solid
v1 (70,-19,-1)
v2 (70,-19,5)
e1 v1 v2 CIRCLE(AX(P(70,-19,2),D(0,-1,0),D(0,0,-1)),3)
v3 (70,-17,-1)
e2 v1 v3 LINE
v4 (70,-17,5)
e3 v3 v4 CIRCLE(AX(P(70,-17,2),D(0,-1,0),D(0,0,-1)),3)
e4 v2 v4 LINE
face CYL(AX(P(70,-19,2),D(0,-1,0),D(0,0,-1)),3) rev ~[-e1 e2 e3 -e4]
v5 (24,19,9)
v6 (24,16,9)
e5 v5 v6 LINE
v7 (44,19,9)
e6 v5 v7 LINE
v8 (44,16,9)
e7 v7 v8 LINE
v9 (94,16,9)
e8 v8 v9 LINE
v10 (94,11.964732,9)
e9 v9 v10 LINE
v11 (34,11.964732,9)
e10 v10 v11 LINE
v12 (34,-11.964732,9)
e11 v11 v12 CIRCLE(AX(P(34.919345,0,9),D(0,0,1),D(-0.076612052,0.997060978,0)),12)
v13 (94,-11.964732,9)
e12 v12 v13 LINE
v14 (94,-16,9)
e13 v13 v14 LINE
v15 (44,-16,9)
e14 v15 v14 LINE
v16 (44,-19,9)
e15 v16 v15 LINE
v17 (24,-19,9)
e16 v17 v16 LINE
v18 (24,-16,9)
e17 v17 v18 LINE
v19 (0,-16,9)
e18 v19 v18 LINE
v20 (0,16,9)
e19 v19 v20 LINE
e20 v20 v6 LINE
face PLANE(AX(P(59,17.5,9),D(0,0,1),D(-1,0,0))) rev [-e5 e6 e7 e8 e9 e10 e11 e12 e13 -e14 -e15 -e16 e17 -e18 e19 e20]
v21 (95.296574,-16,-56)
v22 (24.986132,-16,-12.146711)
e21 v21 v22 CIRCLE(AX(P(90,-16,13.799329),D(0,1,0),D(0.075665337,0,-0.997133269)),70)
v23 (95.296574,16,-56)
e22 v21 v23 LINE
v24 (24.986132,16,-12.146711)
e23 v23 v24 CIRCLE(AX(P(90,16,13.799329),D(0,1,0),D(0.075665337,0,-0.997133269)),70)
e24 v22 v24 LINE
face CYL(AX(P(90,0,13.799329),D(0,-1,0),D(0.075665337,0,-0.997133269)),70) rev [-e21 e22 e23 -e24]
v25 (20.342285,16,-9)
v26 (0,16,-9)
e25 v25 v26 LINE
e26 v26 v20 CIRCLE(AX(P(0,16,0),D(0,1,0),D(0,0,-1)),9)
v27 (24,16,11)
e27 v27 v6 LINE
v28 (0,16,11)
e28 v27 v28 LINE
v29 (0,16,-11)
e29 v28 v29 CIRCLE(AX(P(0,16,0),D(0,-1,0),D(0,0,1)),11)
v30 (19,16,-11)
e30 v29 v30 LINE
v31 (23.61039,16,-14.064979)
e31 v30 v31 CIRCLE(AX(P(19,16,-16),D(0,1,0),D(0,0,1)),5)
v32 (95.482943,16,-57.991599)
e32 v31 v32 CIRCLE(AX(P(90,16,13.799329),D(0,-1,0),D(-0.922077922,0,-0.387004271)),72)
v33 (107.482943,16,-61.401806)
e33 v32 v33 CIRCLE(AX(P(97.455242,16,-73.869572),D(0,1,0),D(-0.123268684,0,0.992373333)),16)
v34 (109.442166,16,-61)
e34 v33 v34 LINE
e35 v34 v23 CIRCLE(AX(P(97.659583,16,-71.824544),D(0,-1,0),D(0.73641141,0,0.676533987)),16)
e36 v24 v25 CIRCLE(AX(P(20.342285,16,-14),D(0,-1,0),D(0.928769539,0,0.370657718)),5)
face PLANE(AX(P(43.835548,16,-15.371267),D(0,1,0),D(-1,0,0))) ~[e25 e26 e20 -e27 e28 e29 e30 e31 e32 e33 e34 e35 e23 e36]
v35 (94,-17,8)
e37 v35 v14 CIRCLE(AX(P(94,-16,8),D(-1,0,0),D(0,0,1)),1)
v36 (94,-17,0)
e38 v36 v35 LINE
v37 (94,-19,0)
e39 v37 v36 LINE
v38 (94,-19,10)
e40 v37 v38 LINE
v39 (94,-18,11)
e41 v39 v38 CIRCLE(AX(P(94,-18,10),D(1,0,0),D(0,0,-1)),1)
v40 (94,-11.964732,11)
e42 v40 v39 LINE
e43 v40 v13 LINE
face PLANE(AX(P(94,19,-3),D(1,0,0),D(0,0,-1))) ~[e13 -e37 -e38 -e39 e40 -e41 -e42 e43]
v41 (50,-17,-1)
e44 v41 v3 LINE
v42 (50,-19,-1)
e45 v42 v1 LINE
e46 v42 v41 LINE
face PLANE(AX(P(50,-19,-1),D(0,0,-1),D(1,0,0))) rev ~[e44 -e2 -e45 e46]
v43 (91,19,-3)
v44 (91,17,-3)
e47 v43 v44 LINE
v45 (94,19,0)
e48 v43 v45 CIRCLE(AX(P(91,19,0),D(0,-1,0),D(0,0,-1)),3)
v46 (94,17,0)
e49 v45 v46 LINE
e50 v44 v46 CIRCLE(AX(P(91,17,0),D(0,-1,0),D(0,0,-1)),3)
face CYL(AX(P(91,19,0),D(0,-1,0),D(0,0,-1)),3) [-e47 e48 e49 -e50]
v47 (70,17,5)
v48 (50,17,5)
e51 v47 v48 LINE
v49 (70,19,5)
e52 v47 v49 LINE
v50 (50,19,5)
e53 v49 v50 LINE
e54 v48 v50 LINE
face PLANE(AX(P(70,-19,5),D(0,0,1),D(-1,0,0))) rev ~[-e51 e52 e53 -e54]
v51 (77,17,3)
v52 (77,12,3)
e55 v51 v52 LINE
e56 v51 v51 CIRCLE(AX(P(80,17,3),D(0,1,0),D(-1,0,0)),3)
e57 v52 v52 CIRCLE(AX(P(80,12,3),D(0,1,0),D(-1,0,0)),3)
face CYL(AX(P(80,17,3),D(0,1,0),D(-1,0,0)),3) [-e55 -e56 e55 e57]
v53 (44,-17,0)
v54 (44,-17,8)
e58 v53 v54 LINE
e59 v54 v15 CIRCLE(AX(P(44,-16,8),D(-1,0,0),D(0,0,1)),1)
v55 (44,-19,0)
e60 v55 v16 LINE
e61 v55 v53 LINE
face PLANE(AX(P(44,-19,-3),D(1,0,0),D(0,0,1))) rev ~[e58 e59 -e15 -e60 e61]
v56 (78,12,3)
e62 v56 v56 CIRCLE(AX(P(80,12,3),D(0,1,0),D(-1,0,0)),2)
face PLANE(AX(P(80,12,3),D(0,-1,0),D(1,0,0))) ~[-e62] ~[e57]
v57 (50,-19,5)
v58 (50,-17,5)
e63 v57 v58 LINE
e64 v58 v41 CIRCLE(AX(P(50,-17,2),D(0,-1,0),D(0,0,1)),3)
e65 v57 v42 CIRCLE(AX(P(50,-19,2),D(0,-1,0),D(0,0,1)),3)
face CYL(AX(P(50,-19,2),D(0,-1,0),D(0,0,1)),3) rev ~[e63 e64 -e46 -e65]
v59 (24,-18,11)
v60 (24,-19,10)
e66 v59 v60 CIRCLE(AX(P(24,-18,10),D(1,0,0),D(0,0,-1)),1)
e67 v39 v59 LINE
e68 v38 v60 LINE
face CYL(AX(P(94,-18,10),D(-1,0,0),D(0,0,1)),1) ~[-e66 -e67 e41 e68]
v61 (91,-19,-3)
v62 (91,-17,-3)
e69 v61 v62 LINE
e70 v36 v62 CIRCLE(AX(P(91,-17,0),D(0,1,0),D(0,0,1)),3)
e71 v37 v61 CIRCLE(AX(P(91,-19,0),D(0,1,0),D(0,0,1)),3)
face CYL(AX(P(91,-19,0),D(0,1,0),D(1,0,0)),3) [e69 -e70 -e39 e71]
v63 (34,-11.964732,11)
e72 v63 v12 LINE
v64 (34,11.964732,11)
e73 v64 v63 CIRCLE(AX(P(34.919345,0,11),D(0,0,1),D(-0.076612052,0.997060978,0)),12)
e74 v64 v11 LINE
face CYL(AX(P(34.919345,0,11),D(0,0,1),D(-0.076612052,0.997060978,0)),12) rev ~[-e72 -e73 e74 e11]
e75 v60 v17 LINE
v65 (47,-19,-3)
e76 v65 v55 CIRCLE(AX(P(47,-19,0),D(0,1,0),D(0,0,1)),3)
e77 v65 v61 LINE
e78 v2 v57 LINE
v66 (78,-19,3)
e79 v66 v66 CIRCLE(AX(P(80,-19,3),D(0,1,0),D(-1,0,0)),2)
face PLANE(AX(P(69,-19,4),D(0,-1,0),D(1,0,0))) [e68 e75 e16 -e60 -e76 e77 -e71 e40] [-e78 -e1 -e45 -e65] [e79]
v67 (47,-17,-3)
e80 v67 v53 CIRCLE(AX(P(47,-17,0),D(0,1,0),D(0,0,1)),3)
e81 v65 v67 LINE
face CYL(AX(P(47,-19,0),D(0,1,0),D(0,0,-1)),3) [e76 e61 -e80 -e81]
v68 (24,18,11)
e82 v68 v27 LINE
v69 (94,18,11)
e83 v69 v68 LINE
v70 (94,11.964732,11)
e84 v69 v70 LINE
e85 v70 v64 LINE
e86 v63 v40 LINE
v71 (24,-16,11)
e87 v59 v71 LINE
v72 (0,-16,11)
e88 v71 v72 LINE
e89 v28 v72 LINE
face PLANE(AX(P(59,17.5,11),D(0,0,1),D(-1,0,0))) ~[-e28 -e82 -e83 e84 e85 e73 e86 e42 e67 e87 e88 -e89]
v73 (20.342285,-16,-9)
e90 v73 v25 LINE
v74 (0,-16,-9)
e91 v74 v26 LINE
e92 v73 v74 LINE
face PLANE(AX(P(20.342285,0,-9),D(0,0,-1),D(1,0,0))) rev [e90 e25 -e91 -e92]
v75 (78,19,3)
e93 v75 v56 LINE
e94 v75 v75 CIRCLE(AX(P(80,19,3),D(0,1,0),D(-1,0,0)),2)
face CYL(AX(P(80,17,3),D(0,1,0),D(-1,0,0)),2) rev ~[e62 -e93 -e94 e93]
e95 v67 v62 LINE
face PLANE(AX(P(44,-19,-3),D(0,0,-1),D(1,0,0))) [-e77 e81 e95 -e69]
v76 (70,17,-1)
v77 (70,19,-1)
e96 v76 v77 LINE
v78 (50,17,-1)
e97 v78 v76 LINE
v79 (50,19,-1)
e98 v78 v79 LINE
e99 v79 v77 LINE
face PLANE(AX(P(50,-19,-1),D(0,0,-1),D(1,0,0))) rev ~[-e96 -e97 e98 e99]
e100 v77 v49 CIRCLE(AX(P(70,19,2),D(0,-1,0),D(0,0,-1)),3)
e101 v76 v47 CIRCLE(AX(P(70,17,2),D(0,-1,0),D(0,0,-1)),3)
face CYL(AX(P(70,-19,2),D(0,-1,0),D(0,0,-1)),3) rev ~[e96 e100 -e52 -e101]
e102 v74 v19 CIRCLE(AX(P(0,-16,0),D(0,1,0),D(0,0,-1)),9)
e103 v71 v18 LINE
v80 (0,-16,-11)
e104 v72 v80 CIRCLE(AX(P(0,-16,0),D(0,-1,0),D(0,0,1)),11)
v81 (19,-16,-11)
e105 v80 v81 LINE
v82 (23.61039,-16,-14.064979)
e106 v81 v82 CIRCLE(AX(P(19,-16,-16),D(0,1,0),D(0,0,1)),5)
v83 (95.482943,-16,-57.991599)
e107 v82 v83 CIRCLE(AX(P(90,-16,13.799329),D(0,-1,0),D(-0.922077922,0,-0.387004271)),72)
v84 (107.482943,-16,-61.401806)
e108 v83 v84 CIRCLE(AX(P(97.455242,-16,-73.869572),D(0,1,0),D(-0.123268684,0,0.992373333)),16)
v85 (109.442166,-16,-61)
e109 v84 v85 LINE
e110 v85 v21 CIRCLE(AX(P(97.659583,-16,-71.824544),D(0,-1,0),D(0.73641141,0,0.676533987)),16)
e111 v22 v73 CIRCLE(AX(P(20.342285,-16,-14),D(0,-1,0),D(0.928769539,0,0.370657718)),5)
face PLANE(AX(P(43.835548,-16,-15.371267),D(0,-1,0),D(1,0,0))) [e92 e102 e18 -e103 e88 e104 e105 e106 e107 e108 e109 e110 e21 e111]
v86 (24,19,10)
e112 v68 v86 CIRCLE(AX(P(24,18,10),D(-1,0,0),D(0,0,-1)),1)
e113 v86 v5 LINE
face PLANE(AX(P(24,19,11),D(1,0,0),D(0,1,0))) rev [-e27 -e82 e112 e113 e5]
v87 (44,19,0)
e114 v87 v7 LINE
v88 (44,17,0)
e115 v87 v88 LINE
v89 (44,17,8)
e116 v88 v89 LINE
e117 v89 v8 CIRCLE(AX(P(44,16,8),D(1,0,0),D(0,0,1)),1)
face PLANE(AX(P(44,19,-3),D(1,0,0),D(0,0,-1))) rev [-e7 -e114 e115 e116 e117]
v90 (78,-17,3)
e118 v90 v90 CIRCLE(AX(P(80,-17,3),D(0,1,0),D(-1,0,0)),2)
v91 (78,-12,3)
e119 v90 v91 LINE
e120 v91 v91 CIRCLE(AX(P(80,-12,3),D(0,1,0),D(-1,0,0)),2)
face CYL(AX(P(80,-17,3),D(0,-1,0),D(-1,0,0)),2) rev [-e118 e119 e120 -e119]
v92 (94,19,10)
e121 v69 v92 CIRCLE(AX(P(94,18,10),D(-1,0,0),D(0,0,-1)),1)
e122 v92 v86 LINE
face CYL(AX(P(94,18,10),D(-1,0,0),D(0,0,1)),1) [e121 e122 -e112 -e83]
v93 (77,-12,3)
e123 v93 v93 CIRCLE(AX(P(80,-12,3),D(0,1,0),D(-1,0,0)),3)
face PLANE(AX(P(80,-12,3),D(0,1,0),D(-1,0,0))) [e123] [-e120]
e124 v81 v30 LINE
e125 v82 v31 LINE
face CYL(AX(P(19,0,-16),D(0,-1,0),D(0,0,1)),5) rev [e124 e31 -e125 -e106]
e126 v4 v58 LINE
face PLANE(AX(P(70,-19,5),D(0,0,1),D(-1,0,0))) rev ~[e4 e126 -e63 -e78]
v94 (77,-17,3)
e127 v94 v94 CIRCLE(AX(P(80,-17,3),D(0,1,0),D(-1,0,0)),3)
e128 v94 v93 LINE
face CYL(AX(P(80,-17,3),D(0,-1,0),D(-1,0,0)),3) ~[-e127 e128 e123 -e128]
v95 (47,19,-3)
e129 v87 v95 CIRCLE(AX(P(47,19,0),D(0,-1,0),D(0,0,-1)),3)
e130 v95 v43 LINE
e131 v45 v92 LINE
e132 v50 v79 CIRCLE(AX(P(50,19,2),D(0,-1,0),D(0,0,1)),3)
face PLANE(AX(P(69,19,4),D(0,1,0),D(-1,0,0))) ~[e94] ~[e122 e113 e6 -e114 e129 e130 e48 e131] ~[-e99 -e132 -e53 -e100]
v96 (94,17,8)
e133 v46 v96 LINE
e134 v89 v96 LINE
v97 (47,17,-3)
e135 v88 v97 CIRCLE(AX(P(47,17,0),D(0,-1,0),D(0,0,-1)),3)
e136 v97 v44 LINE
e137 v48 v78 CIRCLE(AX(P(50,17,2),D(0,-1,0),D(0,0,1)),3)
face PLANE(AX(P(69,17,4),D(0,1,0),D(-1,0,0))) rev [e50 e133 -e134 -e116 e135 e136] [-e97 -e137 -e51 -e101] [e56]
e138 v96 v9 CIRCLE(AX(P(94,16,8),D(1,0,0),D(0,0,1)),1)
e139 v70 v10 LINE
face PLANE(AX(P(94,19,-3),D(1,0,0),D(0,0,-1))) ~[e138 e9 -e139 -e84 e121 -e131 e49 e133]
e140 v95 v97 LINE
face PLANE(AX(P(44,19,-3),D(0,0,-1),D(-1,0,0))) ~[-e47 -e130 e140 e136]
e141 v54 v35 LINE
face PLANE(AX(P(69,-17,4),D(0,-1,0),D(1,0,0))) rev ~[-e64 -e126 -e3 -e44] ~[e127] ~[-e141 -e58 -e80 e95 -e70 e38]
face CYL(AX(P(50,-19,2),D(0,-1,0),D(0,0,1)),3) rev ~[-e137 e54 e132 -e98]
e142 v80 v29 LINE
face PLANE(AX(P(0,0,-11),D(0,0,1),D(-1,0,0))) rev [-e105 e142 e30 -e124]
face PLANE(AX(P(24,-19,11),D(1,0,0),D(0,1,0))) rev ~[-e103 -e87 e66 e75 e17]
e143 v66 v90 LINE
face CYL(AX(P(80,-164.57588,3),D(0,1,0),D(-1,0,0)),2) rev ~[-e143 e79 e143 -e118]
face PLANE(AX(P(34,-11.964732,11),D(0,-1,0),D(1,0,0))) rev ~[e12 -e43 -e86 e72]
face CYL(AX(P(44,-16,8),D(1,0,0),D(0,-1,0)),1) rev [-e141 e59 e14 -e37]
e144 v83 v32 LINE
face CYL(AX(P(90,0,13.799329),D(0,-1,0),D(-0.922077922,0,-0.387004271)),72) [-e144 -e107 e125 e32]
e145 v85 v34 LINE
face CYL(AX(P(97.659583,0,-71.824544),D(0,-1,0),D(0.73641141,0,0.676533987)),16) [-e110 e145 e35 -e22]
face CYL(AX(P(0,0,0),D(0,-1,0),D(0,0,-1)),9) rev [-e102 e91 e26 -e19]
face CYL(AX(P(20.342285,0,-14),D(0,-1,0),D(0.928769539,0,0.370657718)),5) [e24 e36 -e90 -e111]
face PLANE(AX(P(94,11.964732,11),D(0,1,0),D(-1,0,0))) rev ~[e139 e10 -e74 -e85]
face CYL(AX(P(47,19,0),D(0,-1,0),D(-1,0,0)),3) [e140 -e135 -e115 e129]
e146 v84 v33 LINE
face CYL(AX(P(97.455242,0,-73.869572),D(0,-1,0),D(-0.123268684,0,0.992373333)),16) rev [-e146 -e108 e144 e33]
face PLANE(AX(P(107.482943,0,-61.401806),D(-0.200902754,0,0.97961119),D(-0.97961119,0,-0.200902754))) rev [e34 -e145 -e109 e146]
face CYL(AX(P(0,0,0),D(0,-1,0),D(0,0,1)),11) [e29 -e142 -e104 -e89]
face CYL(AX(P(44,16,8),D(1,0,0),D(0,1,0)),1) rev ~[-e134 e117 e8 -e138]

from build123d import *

# Parameters (mm, degrees)
F1_DEPTH  = 16
F3_W      = 70
F3_H      = 3
F4_DEPTH  = 2
F5_W      = 50
F5_H      = 14
F6_DEPTH  = 2
F7_R      = 1
F10_DEPTH = 2
F12_DEPTH = 38.001
F14_D     = 4
F15_R     = 3
F15_R_2   = 2
F16_DEPTH = 5
F17_R     = 3


# Not quite as in the source:
# - a pattern or mirror of a feature is missing from the dataset's text; its kind, count and spacing are read off the source's solid


with BuildPart() as f1:
    # F0 (on Front) → F1 (new body)
    with BuildSketch(Plane.XZ):
        with BuildLine():
            ThreePointArc((0, -9), (-9, 0), (0, 9))
            Line((0, 9), (94, 9))
            Line((94, 9), (94, 11))
            Line((94, 11), (0, 11))
            ThreePointArc((0, 11), (-11, 0), (0, -11))
            Line((0, -11), (19, -11))
            ThreePointArc((19, -11), (21.7681124643, -11.8361612201), (23.6103896104, -14.064978646))
            ThreePointArc((23.6103896104, -14.064978646), (52.4527960943, -47.6352500016), (95.4829432523, -57.9915990802))
            ThreePointArc((95.4829432523, -57.9915990802), (101.8289994783, -58.4789828394), (107.4829432523, -61.4018055084))
            Line((107.4829432523, -61.4018055084), (109.4421656321, -61))
            ThreePointArc((109.4421656321, -61), (102.9917579834, -56.7391896111), (95.2965735981, -56))
            ThreePointArc((95.2965735981, -56), (52.955209083, -45.5949761441), (24.9861322889, -12.1467114099))
            ThreePointArc((24.9861322889, -12.1467114099), (23.1470623984, -9.8607704249), (20.3422845953, -9))
            Line((20.3422845953, -9), (0, -9))
        make_face()
    extrude(amount=F1_DEPTH)

    # F3 (on face) → F4 (join)
    with BuildSketch(Plane.XY.offset(11)):
        with Locations((59, -17.5)):
            Rectangle(F3_W, F3_H)
    extrude(amount=-F4_DEPTH)

    # F5 (on face) → F6 (join)
    with BuildSketch(Plane.XZ.offset(19)):
        with Locations((69, 4)):
            Rectangle(F5_W, F5_H)
    extrude(amount=-F6_DEPTH)

    # F7
    f7_edges = [f1.edges().sort_by_distance(p)[0] for p in [
        (59, -19, 11),
        (69, -17, 9),
    ]]
    fillet(f7_edges, radius=F7_R)

    # F8: F1 across plane


with BuildPart() as f1_1:
    add(f1.part)
    add(f1.part.mirror(Plane.XZ))

    # F9 (on face) → F10 (cut)
    with BuildSketch(Plane.XY.offset(11)):
        with BuildLine():
            Line((94, 11.964731734), (34, 11.964731734))
            ThreePointArc((34, 11.964731734), (22.9193446211, 0), (34, -11.964731734))
            Line((34, -11.964731734), (94, -11.964731734))
            Line((94, -11.964731734), (94, 11.964731734))
        make_face()
    extrude(amount=-F10_DEPTH, mode=Mode.SUBTRACT)

    # F11 (on face) → F12 (cut, through all)
    with BuildSketch(Plane.XZ.offset(19)):
        with BuildLine():
            ThreePointArc((50, 5), (47, 2), (50, -1))
            Line((50, -1), (70, -1))
            ThreePointArc((70, -1), (73, 2), (70, 5))
            Line((70, 5), (50, 5))
        make_face()
    extrude(amount=-F12_DEPTH, mode=Mode.SUBTRACT)

    # F14 (through all)
    with Locations(Plane.XZ.offset(19)):
        with Locations((80, 3)):
            Hole(F14_D / 2)

    # F15 (on face) → F16 (join)
    with BuildSketch(Plane(origin=(0, -17, 0), x_dir=(-1, 0, 0), z_dir=(0, 1, 0))):
        with Locations((-80, 3)):
            Circle(F15_R)
        with Locations((-80, 3)):
            Circle(F15_R_2, mode=Mode.SUBTRACT)
    f16 = extrude(amount=F16_DEPTH)

    # F16_copies: F16 across plane
    add(f16.mirror(Plane.ZX))

    # F17
    f17_edges = [f1_1.edges().sort_by_distance(p)[0] for p in [
        (44, -18, -3),
        (94, 18, -3),
        (94, -18, -3),
        (44, 18, -3),
    ]]
    fillet(f17_edges, radius=F17_R)


solid = f1_1.part
